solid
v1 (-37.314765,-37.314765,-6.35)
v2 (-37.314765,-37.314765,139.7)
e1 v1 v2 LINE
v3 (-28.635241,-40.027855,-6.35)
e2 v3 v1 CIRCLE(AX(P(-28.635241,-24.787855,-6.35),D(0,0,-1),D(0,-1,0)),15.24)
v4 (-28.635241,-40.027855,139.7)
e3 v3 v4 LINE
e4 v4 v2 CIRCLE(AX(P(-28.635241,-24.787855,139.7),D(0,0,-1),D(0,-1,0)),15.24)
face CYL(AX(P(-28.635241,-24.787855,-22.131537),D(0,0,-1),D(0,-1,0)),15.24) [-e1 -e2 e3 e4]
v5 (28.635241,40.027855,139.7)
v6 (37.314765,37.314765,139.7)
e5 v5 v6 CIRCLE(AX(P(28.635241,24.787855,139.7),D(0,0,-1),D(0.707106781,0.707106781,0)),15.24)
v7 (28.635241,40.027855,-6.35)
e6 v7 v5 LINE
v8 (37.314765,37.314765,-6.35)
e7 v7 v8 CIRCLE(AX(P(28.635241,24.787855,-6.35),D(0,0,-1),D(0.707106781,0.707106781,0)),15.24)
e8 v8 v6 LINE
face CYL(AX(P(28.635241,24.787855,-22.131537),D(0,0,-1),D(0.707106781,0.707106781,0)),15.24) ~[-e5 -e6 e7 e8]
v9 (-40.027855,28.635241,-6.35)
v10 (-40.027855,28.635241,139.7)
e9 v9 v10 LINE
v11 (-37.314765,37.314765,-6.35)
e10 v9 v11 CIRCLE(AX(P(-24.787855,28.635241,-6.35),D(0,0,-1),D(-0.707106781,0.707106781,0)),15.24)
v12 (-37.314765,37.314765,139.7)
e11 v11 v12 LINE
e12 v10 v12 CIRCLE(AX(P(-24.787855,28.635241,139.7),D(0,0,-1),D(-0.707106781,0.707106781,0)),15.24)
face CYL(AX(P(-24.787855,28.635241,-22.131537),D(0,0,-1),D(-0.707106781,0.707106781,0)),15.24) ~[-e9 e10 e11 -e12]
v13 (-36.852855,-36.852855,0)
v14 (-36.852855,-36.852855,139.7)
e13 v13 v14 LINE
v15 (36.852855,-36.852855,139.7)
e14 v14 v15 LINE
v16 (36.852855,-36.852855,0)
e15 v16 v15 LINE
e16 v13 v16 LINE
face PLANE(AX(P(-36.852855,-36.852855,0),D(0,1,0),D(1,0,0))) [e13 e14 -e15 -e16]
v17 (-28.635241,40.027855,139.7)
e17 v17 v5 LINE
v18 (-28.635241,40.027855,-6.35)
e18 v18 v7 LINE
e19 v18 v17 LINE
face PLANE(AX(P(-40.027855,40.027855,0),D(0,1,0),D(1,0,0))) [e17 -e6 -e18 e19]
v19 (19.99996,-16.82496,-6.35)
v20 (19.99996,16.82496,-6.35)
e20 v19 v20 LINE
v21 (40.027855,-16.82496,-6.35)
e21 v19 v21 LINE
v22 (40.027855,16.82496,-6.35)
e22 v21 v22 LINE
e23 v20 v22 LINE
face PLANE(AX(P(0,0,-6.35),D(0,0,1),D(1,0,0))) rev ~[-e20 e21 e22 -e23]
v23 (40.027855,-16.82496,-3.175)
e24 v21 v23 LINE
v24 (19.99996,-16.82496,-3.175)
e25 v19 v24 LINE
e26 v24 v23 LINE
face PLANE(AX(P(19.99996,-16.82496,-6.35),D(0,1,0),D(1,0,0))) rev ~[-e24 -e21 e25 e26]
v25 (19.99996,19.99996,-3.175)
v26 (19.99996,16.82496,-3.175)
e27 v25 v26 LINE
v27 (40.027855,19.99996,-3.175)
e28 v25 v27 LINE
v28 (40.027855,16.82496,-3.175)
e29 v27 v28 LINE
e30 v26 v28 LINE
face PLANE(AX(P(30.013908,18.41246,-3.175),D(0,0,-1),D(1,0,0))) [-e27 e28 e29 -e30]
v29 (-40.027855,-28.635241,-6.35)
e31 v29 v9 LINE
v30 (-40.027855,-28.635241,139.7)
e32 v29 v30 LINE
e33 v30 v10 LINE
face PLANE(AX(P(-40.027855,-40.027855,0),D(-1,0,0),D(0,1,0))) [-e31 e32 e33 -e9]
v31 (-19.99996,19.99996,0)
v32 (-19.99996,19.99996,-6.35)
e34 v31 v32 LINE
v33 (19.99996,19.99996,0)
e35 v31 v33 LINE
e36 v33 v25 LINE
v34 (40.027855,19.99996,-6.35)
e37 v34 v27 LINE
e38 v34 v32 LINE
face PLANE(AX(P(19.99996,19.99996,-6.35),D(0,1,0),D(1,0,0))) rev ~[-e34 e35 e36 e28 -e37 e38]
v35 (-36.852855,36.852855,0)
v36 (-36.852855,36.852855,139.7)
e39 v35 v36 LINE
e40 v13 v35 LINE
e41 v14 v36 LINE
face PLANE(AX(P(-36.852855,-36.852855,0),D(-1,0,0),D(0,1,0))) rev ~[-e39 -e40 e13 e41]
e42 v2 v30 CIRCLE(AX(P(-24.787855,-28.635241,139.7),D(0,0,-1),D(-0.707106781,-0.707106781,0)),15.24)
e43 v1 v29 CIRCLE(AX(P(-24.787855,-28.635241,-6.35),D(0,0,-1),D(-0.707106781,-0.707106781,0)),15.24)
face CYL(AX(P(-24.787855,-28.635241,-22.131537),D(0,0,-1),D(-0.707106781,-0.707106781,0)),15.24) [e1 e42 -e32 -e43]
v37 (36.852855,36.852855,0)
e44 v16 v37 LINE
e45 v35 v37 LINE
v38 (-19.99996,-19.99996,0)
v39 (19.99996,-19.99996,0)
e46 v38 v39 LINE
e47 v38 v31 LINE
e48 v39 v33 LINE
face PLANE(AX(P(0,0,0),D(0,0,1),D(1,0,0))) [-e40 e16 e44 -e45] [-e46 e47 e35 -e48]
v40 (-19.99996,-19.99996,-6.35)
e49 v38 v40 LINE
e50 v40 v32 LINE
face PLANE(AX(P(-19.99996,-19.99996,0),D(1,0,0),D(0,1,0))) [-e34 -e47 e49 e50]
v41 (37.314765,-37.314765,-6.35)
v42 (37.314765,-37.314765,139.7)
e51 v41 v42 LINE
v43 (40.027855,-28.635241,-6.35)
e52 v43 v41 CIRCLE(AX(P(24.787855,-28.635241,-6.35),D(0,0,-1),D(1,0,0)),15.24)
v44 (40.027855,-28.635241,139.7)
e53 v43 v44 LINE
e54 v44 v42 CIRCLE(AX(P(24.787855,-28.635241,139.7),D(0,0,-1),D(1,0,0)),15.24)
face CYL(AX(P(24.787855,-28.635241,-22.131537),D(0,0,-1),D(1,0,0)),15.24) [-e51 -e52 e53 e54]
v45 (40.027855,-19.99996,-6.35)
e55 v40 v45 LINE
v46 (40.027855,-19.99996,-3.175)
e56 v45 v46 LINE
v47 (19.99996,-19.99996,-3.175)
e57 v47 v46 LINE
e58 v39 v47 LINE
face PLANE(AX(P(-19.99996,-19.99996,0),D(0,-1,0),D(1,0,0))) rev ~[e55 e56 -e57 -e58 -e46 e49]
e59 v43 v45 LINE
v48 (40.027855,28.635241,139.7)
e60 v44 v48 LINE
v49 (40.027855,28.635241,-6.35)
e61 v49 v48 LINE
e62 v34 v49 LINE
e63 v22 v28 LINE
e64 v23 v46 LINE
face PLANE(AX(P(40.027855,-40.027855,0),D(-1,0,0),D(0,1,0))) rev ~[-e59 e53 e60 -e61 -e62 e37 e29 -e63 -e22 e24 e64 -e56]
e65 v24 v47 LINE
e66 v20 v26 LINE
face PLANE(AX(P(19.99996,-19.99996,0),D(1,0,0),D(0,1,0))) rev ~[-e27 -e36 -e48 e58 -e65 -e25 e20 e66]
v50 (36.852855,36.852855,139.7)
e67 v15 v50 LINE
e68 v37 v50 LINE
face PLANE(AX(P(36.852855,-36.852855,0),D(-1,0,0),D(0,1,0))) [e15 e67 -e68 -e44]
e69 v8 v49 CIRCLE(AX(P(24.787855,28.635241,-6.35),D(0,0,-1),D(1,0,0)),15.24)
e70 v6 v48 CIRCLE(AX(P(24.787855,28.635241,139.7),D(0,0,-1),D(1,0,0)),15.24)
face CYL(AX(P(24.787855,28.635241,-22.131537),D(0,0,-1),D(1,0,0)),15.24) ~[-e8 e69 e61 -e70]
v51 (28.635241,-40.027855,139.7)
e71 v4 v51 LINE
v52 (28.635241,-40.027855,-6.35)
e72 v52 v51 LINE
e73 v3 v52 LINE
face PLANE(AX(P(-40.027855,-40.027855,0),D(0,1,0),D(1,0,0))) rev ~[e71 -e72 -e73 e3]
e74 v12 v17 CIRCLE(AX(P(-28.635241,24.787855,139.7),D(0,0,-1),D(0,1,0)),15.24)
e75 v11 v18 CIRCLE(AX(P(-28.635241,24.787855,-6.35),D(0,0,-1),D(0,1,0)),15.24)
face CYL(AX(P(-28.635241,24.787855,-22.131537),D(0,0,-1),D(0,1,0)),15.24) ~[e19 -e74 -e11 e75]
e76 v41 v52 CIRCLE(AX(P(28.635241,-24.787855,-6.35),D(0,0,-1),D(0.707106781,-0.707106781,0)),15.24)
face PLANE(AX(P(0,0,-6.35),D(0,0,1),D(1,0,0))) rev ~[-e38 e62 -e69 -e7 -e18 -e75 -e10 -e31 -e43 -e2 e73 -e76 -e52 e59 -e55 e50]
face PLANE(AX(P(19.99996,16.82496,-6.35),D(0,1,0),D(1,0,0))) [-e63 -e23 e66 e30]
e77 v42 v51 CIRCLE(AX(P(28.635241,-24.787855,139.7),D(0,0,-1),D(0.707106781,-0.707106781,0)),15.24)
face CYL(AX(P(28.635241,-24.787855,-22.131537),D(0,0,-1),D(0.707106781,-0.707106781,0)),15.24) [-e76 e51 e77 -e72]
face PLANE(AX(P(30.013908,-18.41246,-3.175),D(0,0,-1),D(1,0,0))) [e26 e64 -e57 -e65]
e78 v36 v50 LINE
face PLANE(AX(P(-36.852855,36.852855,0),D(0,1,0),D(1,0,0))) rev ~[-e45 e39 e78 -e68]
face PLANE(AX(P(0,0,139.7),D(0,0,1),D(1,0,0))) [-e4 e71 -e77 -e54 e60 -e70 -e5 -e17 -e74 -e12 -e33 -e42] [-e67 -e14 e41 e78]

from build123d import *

# Parameters (mm, degrees)
F0_W        = 80.0557104707
F0_H        = 80.0557104707
F0_W_2      = 73.7057104707
F0_H_2      = 73.7057104707
F0_W_3      = 39.99992
F0_H_3      = 39.99992
F1_DEPTH    = 6.35
F2_DEPTH    = 9.144
F3_DEPTH    = 139.7
F4_W        = 20.0278952353
F4_H        = 3.175
F5_DEPTH    = 3.175
F7_SIZE     = 5.08
F6_T1_DEPTH = 177.6130734528


# Not quite as in the source:
# - a fillet or chamfer that OpenCascade refuses, or shapes differently, is made with other operations: its cross-section is extruded or revolved along the edge and cut away or added


with BuildPart() as f1:
    # F0 (on Top) → F1 (new body)
    with BuildSketch(Plane.XY):
        Rectangle(F0_W, F0_H)
        Rectangle(F0_W_2, F0_H_2, mode=Mode.SUBTRACT)
        Rectangle(F0_W_2, F0_H_2)
        Rectangle(F0_W_3, F0_H_3, mode=Mode.SUBTRACT)
        Rectangle(F0_W_3, F0_H_3)
    extrude(amount=-F1_DEPTH)

    # F0 (on Top) → F2 (cut)
    with BuildSketch(Plane.XY):
        Rectangle(F0_W_3, F0_H_3)
    extrude(amount=-F2_DEPTH, mode=Mode.SUBTRACT)

    # F0 (on Top) → F3 (join)
    with BuildSketch(Plane.XY):
        Rectangle(F0_W, F0_H)
        Rectangle(F0_W_2, F0_H_2, mode=Mode.SUBTRACT)
    extrude(amount=F3_DEPTH)

    # F4 (on face) → F5 (cut)
    with BuildSketch(Plane(origin=(0, 0, -6.35), x_dir=(1, 0, 0), z_dir=(0, 0, -1))):
        with Locations((30.0139076177, 18.41246)):
            Rectangle(F4_W, F4_H)
        with Locations((30.0139076177, -18.41246)):
            Rectangle(F4_W, F4_H)
    extrude(amount=-F5_DEPTH, mode=Mode.SUBTRACT)

    # F7
    f7_edges = [f1.edges().sort_by_distance(p)[0] for p in [
        (40.027855, -40.027855, 66.675),
        (-40.027855, -40.027855, 66.675),
        (-40.027855, 40.027855, 66.675),
        (40.027855, 40.027855, 66.675),
    ]]
    chamfer(f7_edges, length=F7_SIZE)

    # F6: fillet of radius 15.24 on 8 edges, made by hand

    # F6_s2 → F6_t1 (cut)
    with BuildSketch(Plane.XY.offset(-22.1315367264)):
        with BuildLine():
            ThreePointArc((-28.6352405448, -40.0278552353), (-34.467336054, -38.8677793108), (-39.4115478901, -35.5641625806))
            Line((-39.4115478901, -35.5641625806), (-34.9478552353, -40.0278552353))
            Line((-34.9478552353, -40.0278552353), (-28.6352405448, -40.0278552353))
        make_face()
        with BuildLine():
            ThreePointArc((-35.5641625806, -39.4115478901), (-38.8677793108, -34.467336054), (-40.0278552353, -28.6352405448))
            Line((-40.0278552353, -28.6352405448), (-40.0278552353, -34.9478552353))
            Line((-40.0278552353, -34.9478552353), (-35.5641625806, -39.4115478901))
        make_face()
        with BuildLine():
            ThreePointArc((-35.5641625806, 39.4115478901), (-38.8677793108, 34.467336054), (-40.0278552353, 28.6352405448))
            Line((-40.0278552353, 28.6352405448), (-40.0278552353, 34.9478552353))
            Line((-40.0278552353, 34.9478552353), (-35.5641625806, 39.4115478901))
        make_face()
        with BuildLine():
            ThreePointArc((-28.6352405448, 40.0278552353), (-34.467336054, 38.8677793108), (-39.4115478901, 35.5641625806))
            Line((-39.4115478901, 35.5641625806), (-34.9478552353, 40.0278552353))
            Line((-34.9478552353, 40.0278552353), (-28.6352405448, 40.0278552353))
        make_face()
        with BuildLine():
            ThreePointArc((40.0278552353, -28.6352405448), (38.8677793108, -34.467336054), (35.5641625806, -39.4115478901))
            Line((35.5641625806, -39.4115478901), (40.0278552353, -34.9478552353))
            Line((40.0278552353, -34.9478552353), (40.0278552353, -28.6352405448))
        make_face()
        with BuildLine():
            ThreePointArc((39.4115478901, -35.5641625806), (34.467336054, -38.8677793108), (28.6352405448, -40.0278552353))
            Line((28.6352405448, -40.0278552353), (34.9478552353, -40.0278552353))
            Line((34.9478552353, -40.0278552353), (39.4115478901, -35.5641625806))
        make_face()
        with BuildLine():
            ThreePointArc((40.0278552353, 28.6352405448), (38.8677793108, 34.467336054), (35.5641625806, 39.4115478901))
            Line((35.5641625806, 39.4115478901), (40.0278552353, 34.9478552353))
            Line((40.0278552353, 34.9478552353), (40.0278552353, 28.6352405448))
        make_face()
        with BuildLine():
            ThreePointArc((39.4115478901, 35.5641625806), (34.467336054, 38.8677793108), (28.6352405448, 40.0278552353))
            Line((28.6352405448, 40.0278552353), (34.9478552353, 40.0278552353))
            Line((34.9478552353, 40.0278552353), (39.4115478901, 35.5641625806))
        make_face()
    extrude(amount=F6_T1_DEPTH, mode=Mode.SUBTRACT)


solid = f1.part
